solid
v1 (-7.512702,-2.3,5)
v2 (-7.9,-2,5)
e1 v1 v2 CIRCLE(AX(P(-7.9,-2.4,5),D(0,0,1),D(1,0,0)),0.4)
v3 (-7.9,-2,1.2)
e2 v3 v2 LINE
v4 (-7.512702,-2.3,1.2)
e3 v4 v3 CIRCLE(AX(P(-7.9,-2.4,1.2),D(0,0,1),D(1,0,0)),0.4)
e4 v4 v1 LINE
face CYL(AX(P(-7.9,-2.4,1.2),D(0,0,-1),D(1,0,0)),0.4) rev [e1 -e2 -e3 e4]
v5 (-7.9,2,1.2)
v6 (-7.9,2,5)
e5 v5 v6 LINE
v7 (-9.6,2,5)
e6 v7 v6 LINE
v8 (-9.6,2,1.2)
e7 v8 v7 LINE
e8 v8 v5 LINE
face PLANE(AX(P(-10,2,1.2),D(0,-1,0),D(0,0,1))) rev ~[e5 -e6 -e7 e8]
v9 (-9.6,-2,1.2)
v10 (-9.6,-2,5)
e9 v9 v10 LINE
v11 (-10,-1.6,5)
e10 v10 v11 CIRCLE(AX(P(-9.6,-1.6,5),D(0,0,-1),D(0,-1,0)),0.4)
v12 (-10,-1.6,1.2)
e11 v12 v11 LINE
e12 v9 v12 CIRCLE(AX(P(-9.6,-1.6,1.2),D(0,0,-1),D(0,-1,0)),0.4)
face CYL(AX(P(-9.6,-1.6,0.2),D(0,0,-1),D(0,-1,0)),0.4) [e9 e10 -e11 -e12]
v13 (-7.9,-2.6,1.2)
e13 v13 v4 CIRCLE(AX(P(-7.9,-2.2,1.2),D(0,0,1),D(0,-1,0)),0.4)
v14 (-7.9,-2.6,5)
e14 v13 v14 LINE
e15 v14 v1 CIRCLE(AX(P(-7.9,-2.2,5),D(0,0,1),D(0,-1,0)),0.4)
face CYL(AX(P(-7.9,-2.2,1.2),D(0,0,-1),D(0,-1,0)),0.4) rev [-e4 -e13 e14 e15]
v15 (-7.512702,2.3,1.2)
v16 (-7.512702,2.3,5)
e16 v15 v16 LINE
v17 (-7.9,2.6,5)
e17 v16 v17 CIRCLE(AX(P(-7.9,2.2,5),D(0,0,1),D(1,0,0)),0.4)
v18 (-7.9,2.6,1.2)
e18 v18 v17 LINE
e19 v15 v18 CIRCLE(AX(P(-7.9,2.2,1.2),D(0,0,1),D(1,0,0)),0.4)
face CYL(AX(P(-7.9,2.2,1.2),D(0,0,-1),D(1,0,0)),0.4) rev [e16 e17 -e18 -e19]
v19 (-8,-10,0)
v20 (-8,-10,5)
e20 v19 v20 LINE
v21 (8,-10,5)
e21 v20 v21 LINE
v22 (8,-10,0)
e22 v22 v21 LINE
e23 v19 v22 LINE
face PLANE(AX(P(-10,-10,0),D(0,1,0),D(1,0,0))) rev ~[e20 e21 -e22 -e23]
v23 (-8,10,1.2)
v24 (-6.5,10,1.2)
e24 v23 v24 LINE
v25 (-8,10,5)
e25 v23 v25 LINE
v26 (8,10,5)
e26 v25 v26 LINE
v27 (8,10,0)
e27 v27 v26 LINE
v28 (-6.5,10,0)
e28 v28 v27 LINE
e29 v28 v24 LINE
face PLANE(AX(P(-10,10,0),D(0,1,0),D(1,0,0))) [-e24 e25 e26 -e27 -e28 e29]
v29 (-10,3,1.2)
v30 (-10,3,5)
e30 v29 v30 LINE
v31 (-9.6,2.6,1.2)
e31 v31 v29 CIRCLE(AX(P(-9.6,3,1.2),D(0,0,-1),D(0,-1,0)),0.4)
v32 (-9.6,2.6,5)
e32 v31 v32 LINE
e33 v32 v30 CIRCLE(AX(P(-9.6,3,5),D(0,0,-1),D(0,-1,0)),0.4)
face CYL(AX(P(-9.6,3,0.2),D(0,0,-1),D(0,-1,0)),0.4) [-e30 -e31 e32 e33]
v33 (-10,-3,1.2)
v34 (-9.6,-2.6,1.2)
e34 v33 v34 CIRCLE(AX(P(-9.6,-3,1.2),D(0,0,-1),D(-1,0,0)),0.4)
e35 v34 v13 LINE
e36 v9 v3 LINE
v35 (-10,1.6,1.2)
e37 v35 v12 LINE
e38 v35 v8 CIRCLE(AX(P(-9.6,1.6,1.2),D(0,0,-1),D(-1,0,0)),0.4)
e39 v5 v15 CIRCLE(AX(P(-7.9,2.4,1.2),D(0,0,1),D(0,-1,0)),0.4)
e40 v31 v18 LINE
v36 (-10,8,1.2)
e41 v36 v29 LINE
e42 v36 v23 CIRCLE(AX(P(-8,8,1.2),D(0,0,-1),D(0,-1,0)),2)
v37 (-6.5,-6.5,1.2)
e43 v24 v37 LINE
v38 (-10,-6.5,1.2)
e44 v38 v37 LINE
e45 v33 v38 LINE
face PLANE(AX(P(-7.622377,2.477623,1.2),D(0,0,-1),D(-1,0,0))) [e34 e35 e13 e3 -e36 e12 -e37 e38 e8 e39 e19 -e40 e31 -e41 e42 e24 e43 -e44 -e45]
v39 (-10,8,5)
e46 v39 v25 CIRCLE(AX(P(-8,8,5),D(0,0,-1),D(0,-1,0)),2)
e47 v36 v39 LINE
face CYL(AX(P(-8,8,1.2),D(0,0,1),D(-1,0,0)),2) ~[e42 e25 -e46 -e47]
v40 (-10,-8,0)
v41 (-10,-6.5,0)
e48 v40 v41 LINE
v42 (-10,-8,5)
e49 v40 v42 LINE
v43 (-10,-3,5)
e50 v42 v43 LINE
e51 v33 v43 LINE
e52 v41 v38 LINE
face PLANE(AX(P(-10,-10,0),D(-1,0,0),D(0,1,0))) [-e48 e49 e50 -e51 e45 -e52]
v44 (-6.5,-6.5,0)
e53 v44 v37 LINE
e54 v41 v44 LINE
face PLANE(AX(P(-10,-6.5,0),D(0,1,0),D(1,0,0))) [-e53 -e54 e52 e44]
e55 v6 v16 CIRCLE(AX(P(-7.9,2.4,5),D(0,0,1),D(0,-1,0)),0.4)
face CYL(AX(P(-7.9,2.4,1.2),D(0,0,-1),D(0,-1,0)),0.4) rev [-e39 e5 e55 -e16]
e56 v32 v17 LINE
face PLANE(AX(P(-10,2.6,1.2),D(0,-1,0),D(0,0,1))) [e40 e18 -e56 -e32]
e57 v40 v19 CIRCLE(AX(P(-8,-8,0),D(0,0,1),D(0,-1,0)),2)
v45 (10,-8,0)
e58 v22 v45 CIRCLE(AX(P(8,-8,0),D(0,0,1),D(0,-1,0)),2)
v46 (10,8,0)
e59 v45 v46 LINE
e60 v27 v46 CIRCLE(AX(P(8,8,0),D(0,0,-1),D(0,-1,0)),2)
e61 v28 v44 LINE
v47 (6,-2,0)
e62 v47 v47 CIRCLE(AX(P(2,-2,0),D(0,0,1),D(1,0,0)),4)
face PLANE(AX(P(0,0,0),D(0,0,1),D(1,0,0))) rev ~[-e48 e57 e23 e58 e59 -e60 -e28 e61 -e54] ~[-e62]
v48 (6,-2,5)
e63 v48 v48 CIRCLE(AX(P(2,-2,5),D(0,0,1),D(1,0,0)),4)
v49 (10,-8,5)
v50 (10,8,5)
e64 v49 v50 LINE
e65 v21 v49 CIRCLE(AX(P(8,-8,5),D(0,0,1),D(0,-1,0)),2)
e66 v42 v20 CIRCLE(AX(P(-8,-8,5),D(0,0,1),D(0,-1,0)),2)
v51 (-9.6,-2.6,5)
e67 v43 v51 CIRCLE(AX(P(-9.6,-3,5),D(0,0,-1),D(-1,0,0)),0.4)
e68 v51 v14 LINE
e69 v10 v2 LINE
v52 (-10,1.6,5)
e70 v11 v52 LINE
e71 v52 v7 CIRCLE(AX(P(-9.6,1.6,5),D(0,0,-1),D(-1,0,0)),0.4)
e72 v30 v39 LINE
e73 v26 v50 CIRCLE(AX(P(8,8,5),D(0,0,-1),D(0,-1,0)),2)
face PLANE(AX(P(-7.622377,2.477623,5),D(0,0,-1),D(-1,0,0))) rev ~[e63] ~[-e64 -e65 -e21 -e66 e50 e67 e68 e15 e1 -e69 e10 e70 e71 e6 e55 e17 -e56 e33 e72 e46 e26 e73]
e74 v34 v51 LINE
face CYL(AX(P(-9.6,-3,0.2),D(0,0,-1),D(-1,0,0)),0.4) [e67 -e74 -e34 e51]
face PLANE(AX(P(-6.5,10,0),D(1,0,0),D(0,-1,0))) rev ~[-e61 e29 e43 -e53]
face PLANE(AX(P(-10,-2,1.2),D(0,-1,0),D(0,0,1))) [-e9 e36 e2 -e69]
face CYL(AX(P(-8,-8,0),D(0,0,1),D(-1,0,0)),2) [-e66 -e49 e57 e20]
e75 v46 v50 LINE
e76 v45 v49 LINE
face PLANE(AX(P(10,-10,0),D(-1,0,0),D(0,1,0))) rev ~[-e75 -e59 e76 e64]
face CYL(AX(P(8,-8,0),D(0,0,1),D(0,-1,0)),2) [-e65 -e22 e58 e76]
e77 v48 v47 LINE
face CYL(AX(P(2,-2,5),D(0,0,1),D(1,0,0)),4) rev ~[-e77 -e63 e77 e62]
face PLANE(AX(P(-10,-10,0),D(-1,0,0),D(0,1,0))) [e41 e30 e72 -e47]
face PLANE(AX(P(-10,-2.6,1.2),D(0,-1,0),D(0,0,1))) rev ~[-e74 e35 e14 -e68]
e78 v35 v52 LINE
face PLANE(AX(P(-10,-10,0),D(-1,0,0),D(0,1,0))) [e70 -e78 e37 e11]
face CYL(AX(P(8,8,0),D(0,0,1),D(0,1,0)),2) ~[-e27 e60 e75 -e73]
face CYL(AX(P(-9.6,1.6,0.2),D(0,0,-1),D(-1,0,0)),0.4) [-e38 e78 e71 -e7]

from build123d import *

# Parameters (mm, degrees)
F0_W        = 20
F0_H        = 20
F1_DEPTH    = 5
F2_W        = 3.5
F2_H        = 16.5
F3_DEPTH    = 1.2
F4_R        = 4
F5_DEPTH    = 5.001
F6_R        = 2
F7_W        = 0.6
F7_H        = 3.8
F8_DEPTH    = 2.5
F9_T1_DEPTH = 3.8
F9_T3_DEPTH = 5.8


# Not quite as in the source:
# - a fillet or chamfer that OpenCascade refuses, or shapes differently, is made with other operations: its cross-section is extruded or revolved along the edge and cut away or added


with BuildPart() as f1:
    # F0 (on Top) → F1 (new body)
    with BuildSketch(Plane.XY):
        Rectangle(F0_W, F0_H)
    extrude(amount=F1_DEPTH)

    # F2 (on face) → F3 (cut)
    with BuildSketch(Plane(origin=(0, 0, 0), x_dir=(1, 0, 0), z_dir=(0, 0, -1))):
        with Locations((-8.25, -1.75)):
            Rectangle(F2_W, F2_H)
    extrude(amount=-F3_DEPTH, mode=Mode.SUBTRACT)

    # F4 (on face) → F5 (cut, through all)
    with BuildSketch(Plane.XY.offset(5)):
        with Locations((2, -2)):
            Circle(F4_R)
    extrude(amount=-F5_DEPTH, mode=Mode.SUBTRACT)

    # F6
    f6_edges = [f1.edges().sort_by_distance(p)[0] for p in [
        (10, -10, 2.5),
        (-10, -10, 2.5),
        (-10, 10, 3.1),
        (10, 10, 2.5),
    ]]
    fillet(f6_edges, radius=F6_R)

    # F7 (on face) → F8 (cut)
    with BuildSketch(Plane(origin=(-10, 0, 0), x_dir=(0, -1, 0), z_dir=(-1, 0, 0))):
        with Locations((-2.3, 3.1)):
            Rectangle(F7_W, F7_H)
        with Locations((2.3, 3.1)):
            Rectangle(F7_W, F7_H)
    extrude(amount=-F8_DEPTH, mode=Mode.SUBTRACT)

    # F9: fillet of radius 0.4 on 8 edges, made by hand

    # F9_s2 → F9_t1 (join)
    with BuildSketch(Plane.XY.offset(1.2)):
        with BuildLine():
            ThreePointArc((-7.5, 2.2), (-7.6171572875, 2.4828427125), (-7.9, 2.6))
            Line((-7.9, 2.6), (-7.5, 2.6))
            Line((-7.5, 2.6), (-7.5, 2.2))
        make_face()
        with BuildLine():
            ThreePointArc((-7.9, 2), (-7.6171572875, 2.1171572875), (-7.5, 2.4))
            Line((-7.5, 2.4), (-7.5, 2))
            Line((-7.5, 2), (-7.9, 2))
        make_face()
        with BuildLine():
            ThreePointArc((-7.9, -2.6), (-7.6171572875, -2.4828427125), (-7.5, -2.2))
            Line((-7.5, -2.2), (-7.5, -2.6))
            Line((-7.5, -2.6), (-7.9, -2.6))
        make_face()
        with BuildLine():
            ThreePointArc((-7.5, -2.4), (-7.6171572875, -2.1171572875), (-7.9, -2))
            Line((-7.9, -2), (-7.5, -2))
            Line((-7.5, -2), (-7.5, -2.4))
        make_face()
    extrude(amount=F9_T1_DEPTH)

    # F9_s4 → F9_t3 (cut)
    with BuildSketch(Plane.XY.offset(0.2)):
        with BuildLine():
            ThreePointArc((-10, 1.6), (-9.8828427125, 1.8828427125), (-9.6, 2))
            Line((-9.6, 2), (-10, 2))
            Line((-10, 2), (-10, 1.6))
        make_face()
        with BuildLine():
            ThreePointArc((-9.6, -2), (-9.8828427125, -1.8828427125), (-10, -1.6))
            Line((-10, -1.6), (-10, -2))
            Line((-10, -2), (-9.6, -2))
        make_face()
        with BuildLine():
            ThreePointArc((-10, -3), (-9.8828427125, -2.7171572875), (-9.6, -2.6))
            Line((-9.6, -2.6), (-10, -2.6))
            Line((-10, -2.6), (-10, -3))
        make_face()
        with BuildLine():
            ThreePointArc((-9.6, 2.6), (-9.8828427125, 2.7171572875), (-10, 3))
            Line((-10, 3), (-10, 2.6))
            Line((-10, 2.6), (-9.6, 2.6))
        make_face()
    extrude(amount=F9_T3_DEPTH, mode=Mode.SUBTRACT)


solid = f1.part
